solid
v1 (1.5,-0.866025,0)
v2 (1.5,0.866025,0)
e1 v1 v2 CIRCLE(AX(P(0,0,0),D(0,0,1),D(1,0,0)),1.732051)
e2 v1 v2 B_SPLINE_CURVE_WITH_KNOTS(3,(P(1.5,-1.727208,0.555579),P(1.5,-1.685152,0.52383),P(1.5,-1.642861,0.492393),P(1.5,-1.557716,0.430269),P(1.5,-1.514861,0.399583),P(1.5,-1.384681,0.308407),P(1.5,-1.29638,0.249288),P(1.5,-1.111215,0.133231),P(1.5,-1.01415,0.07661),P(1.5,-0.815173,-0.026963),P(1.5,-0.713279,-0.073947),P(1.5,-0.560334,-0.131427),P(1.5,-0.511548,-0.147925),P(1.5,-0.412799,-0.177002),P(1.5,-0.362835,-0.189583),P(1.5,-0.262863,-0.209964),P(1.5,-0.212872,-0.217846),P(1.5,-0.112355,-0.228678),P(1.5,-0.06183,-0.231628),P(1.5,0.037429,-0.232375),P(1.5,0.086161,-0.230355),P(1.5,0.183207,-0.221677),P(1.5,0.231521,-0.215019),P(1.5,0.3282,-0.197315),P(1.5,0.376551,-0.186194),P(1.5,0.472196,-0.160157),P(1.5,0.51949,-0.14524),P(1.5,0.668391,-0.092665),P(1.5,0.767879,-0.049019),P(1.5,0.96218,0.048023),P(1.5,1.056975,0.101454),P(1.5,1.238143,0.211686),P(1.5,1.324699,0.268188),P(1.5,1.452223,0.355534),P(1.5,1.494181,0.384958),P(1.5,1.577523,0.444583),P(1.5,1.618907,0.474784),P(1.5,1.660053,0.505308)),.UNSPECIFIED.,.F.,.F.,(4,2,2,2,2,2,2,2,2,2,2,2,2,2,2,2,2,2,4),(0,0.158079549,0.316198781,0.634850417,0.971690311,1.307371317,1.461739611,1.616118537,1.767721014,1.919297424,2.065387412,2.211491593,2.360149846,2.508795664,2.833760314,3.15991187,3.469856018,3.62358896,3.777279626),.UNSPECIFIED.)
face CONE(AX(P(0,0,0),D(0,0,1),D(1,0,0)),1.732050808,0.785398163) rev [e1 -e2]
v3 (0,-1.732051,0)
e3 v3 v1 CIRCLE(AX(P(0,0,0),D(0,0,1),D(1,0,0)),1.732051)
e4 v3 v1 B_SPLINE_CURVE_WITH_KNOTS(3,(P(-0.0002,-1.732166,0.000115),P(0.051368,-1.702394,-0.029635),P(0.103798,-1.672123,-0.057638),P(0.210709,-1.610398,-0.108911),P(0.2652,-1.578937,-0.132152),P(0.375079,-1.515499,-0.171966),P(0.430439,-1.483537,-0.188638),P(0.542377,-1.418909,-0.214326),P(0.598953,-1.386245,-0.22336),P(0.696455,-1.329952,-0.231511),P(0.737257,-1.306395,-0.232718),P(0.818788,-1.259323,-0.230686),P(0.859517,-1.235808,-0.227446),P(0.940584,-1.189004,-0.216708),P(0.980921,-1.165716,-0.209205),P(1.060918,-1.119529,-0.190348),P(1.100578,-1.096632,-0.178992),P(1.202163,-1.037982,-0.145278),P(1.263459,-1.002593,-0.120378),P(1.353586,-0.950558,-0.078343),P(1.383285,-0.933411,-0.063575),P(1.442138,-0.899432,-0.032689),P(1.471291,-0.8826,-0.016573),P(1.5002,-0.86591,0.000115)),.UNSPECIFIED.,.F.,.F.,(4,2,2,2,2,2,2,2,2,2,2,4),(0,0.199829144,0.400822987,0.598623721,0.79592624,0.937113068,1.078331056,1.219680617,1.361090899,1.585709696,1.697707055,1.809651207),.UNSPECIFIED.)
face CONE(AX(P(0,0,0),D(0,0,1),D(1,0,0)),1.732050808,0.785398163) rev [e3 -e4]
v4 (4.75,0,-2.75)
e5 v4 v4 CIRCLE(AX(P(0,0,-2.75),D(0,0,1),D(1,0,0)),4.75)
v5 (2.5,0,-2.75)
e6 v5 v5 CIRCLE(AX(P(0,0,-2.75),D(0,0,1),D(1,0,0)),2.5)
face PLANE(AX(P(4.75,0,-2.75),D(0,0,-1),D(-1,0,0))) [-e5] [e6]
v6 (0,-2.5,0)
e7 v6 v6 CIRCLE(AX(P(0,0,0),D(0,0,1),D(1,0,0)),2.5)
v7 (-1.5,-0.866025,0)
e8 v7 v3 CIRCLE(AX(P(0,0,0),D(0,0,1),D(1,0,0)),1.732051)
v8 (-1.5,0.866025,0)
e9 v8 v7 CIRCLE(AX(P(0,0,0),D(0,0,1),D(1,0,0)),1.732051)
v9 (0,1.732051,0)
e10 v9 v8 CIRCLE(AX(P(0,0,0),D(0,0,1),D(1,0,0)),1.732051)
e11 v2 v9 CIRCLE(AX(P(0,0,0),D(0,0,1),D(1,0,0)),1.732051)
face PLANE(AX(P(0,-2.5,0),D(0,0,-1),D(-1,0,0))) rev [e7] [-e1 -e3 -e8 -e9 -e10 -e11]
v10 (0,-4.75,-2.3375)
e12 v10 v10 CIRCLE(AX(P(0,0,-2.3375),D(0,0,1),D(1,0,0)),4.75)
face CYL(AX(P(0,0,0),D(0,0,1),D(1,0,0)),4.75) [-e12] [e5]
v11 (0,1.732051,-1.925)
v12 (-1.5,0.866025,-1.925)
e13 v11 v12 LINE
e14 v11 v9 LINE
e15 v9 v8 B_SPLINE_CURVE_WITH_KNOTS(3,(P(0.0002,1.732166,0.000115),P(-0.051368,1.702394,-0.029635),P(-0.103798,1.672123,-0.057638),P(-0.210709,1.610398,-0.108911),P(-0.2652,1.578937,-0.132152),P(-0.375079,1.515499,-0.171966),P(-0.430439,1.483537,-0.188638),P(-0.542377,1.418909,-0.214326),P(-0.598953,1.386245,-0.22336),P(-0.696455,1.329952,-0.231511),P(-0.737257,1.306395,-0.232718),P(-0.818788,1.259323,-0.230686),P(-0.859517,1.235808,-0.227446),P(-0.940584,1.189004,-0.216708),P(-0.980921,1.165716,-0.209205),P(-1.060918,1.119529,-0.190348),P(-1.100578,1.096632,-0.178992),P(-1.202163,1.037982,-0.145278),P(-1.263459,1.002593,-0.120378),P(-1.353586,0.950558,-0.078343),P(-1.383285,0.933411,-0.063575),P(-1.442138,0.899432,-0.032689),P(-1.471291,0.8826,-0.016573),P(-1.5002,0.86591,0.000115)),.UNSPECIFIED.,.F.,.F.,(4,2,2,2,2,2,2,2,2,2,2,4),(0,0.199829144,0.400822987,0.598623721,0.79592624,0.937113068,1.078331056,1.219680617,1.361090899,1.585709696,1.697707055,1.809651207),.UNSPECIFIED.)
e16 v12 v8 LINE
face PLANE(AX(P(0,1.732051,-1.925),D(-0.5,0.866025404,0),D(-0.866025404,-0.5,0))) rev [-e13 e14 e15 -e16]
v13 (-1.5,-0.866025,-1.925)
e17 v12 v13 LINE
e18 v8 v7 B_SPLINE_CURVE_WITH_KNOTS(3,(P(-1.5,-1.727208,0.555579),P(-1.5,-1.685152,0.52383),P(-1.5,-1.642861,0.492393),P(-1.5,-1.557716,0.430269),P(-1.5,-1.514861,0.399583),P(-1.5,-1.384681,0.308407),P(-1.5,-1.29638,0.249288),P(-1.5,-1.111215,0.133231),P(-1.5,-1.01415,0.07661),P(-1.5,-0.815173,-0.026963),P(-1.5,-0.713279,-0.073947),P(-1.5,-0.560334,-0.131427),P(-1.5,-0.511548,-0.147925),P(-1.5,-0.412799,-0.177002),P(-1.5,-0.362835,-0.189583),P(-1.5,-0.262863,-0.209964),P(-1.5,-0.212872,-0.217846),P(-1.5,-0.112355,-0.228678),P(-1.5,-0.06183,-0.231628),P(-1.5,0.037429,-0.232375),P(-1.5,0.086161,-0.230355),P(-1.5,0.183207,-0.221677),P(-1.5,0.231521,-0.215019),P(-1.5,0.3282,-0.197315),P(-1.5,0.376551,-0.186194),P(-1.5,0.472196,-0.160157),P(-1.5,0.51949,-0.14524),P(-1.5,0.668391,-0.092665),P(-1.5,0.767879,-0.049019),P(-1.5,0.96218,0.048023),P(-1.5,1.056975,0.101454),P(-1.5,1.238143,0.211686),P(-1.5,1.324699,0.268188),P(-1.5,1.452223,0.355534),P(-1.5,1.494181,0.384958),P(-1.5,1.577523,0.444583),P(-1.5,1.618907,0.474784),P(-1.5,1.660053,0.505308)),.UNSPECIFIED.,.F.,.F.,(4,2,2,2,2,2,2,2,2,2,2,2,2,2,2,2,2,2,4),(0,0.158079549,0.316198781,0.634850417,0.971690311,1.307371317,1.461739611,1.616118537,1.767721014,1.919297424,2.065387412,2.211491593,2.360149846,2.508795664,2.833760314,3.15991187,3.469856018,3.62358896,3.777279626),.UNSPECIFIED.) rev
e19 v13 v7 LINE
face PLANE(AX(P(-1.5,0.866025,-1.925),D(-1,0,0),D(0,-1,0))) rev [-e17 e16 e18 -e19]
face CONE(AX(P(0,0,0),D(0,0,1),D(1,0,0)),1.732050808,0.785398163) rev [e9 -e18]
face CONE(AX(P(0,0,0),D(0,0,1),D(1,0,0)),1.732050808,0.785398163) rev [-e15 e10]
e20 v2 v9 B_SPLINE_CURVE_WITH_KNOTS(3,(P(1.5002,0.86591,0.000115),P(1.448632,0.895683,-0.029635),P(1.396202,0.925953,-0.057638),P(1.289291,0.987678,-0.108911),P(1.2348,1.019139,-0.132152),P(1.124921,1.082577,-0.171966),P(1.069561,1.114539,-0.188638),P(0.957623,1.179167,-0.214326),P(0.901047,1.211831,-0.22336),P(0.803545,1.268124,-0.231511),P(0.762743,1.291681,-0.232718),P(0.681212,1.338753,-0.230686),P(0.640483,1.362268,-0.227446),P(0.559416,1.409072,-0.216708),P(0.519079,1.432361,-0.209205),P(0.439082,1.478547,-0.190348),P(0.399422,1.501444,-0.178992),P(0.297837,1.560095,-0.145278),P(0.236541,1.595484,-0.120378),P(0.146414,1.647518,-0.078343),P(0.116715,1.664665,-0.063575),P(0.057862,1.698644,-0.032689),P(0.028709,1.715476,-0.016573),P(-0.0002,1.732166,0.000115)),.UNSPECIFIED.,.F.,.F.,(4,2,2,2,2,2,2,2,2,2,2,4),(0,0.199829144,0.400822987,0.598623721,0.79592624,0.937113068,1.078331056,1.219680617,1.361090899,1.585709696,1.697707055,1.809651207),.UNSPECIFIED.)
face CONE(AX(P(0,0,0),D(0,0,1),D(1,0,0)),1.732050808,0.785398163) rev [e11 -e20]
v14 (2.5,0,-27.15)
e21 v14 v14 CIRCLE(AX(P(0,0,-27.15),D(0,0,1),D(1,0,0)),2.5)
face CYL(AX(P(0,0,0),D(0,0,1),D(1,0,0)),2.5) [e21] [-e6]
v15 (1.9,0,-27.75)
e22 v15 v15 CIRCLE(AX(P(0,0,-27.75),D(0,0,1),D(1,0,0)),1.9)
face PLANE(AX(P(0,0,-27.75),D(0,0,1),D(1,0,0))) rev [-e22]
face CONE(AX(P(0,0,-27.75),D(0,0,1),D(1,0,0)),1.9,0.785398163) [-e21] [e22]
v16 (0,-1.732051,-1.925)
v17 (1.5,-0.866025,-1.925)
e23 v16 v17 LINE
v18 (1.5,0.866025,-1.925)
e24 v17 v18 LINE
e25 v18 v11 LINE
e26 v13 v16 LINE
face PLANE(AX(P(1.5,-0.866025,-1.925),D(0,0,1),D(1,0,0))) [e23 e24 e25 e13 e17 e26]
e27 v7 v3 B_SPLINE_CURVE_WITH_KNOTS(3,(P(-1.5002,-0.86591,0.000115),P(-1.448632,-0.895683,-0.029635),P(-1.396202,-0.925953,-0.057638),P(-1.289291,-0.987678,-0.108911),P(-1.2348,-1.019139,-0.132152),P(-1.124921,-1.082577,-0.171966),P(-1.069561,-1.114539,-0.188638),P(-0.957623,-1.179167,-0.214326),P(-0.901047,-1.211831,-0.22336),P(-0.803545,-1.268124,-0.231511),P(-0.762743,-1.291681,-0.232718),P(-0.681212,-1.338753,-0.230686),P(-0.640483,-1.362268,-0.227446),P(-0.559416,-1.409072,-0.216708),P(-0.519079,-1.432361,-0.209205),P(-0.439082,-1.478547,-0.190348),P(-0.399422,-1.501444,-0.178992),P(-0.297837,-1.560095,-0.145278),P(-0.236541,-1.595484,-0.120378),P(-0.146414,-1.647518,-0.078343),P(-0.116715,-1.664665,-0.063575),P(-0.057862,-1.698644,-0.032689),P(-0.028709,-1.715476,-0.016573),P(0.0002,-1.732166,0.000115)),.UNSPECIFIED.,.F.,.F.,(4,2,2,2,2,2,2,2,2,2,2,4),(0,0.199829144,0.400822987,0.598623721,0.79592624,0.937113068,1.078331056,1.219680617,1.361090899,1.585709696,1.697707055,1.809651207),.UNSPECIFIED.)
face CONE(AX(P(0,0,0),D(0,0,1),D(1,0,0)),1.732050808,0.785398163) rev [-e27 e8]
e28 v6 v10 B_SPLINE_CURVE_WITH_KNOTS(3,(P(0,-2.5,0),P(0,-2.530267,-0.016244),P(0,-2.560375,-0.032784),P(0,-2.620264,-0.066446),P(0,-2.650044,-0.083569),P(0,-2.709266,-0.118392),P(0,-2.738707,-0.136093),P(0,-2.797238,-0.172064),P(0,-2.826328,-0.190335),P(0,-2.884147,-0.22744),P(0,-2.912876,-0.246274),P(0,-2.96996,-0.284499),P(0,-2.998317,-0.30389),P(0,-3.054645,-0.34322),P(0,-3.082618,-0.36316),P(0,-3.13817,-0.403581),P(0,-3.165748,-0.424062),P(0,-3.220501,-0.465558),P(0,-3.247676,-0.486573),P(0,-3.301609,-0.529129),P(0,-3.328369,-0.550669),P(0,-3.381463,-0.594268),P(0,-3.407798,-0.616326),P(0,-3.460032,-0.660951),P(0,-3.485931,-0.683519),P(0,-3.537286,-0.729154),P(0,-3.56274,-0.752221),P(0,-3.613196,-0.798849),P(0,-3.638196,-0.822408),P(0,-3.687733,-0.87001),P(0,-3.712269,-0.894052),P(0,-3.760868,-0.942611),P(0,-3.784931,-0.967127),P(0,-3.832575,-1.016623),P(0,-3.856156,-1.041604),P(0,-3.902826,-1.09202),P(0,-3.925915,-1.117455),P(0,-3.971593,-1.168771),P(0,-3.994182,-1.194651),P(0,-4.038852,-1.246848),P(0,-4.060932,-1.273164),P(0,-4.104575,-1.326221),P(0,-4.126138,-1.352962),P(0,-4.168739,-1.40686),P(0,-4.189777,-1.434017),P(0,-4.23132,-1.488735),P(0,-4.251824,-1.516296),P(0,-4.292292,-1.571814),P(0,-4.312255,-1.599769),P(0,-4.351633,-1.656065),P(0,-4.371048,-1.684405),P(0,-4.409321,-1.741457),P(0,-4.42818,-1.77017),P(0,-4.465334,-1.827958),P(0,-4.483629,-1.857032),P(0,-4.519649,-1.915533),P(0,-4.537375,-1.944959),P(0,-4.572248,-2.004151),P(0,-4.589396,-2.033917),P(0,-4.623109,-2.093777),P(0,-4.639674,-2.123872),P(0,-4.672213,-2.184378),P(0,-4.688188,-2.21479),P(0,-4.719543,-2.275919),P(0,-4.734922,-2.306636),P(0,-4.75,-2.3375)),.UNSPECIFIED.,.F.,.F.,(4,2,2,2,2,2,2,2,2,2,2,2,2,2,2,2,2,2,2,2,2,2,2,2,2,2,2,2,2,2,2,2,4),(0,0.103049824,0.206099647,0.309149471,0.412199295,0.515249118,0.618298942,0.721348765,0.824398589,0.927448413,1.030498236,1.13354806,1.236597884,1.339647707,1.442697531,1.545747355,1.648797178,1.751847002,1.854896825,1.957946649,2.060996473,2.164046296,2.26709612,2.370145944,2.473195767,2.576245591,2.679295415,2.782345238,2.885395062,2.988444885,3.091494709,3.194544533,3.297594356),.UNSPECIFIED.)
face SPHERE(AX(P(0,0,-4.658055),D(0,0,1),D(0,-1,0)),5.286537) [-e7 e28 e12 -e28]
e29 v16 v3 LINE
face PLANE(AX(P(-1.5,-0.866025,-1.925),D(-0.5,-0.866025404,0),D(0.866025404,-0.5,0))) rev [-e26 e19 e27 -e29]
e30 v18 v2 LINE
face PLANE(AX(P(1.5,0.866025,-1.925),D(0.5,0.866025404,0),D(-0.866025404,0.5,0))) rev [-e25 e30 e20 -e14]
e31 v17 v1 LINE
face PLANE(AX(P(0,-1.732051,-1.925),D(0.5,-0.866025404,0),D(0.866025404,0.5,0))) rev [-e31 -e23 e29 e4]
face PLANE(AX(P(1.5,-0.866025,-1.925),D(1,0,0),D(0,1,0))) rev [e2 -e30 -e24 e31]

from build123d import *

# Parameters (mm, degrees)
CUT_EXTRUDE2_DEPTH = 1.925


with BuildPart() as part:
    # Sketch10 → Revolve3 (revolve)
    with BuildSketch(Plane(origin=(0, 0, 0), x_dir=(0, 0, -1), z_dir=(1, 0, 0)), mode=Mode.PRIVATE) as revolve3_sk:
        Polygon((27.15, 2.5), (27.75, 1.9), (27.75, 0), (2.75, 0), (2.75, 2.5), align=None)
    revolve(revolve3_sk.sketch.rotate(Axis((0, 0, 0), (0, 0, -1)), 90), axis=Axis((0, 0, 0), (0, 0, -1)))

    # Sketch7 → Revolve2 (revolve)
    with BuildSketch(Plane(origin=(0, 0, 0), x_dir=(0, 0, -1), z_dir=(1, 0, 0)), mode=Mode.PRIVATE) as revolve2_sk:
        with BuildLine():
            Line((2.3375, 4.75), (2.75, 4.75))
            Line((2.75, 4.75), (2.75, 0))
            Line((2.75, 0), (0, 0))
            Line((0, 0), (0, 2.5))
            ThreePointArc((0, 2.5), (0.991875183, 3.808753282), (2.3375, 4.75))
        make_face()
    revolve(revolve2_sk.sketch.rotate(Axis((0, 0, 0), (0, 0, -1)), 180), axis=Axis((0, 0, 0), (0, 0, -1)))

    # Sketch5 → Cut-Extrude2 (cut)
    with BuildSketch(Plane.XY):
        Polygon((1.5, -0.866025404), (1.5, 0.866025404), (0, 1.732050808), (-1.5, 0.866025404), (-1.5, -0.866025404), (0, -1.732050808), align=None)
    extrude(amount=-CUT_EXTRUDE2_DEPTH, mode=Mode.SUBTRACT)

    # Cut-Extrude3 cone 1 section (through the dimple's axis) → Cut-Extrude3 (revolve, cut)
    with BuildSketch(Plane(origin=(0, 0, 0), x_dir=(0, -1, 0), z_dir=(1, 0, 0))):
        Polygon((0, 0), (1.732050808, 0), (0, 1.732050808), align=None)
    revolve(axis=Axis((0, 0, 0), (0, 0, -1)), mode=Mode.SUBTRACT)


with BuildPart() as body_2:
    # Split1: read off the stored shape, not the designer's step
    # Split1: the piece on the far side of the plane
    add(part.part)
    split(bisect_by=Plane.XY.offset(-2.75), keep=Keep.BOTTOM)


with BuildPart() as part_1:
    add(part.part)

    # Split1
    split(bisect_by=Plane.XY.offset(-2.75), keep=Keep.TOP)


with BuildPart() as body_2_1:
    add(body_2.part)

    # Boss-Extrude1: read off the stored shape, not the designer's step
    # Boss-Extrude1: union part
    add(part_1.part)


solid = body_2_1.part
